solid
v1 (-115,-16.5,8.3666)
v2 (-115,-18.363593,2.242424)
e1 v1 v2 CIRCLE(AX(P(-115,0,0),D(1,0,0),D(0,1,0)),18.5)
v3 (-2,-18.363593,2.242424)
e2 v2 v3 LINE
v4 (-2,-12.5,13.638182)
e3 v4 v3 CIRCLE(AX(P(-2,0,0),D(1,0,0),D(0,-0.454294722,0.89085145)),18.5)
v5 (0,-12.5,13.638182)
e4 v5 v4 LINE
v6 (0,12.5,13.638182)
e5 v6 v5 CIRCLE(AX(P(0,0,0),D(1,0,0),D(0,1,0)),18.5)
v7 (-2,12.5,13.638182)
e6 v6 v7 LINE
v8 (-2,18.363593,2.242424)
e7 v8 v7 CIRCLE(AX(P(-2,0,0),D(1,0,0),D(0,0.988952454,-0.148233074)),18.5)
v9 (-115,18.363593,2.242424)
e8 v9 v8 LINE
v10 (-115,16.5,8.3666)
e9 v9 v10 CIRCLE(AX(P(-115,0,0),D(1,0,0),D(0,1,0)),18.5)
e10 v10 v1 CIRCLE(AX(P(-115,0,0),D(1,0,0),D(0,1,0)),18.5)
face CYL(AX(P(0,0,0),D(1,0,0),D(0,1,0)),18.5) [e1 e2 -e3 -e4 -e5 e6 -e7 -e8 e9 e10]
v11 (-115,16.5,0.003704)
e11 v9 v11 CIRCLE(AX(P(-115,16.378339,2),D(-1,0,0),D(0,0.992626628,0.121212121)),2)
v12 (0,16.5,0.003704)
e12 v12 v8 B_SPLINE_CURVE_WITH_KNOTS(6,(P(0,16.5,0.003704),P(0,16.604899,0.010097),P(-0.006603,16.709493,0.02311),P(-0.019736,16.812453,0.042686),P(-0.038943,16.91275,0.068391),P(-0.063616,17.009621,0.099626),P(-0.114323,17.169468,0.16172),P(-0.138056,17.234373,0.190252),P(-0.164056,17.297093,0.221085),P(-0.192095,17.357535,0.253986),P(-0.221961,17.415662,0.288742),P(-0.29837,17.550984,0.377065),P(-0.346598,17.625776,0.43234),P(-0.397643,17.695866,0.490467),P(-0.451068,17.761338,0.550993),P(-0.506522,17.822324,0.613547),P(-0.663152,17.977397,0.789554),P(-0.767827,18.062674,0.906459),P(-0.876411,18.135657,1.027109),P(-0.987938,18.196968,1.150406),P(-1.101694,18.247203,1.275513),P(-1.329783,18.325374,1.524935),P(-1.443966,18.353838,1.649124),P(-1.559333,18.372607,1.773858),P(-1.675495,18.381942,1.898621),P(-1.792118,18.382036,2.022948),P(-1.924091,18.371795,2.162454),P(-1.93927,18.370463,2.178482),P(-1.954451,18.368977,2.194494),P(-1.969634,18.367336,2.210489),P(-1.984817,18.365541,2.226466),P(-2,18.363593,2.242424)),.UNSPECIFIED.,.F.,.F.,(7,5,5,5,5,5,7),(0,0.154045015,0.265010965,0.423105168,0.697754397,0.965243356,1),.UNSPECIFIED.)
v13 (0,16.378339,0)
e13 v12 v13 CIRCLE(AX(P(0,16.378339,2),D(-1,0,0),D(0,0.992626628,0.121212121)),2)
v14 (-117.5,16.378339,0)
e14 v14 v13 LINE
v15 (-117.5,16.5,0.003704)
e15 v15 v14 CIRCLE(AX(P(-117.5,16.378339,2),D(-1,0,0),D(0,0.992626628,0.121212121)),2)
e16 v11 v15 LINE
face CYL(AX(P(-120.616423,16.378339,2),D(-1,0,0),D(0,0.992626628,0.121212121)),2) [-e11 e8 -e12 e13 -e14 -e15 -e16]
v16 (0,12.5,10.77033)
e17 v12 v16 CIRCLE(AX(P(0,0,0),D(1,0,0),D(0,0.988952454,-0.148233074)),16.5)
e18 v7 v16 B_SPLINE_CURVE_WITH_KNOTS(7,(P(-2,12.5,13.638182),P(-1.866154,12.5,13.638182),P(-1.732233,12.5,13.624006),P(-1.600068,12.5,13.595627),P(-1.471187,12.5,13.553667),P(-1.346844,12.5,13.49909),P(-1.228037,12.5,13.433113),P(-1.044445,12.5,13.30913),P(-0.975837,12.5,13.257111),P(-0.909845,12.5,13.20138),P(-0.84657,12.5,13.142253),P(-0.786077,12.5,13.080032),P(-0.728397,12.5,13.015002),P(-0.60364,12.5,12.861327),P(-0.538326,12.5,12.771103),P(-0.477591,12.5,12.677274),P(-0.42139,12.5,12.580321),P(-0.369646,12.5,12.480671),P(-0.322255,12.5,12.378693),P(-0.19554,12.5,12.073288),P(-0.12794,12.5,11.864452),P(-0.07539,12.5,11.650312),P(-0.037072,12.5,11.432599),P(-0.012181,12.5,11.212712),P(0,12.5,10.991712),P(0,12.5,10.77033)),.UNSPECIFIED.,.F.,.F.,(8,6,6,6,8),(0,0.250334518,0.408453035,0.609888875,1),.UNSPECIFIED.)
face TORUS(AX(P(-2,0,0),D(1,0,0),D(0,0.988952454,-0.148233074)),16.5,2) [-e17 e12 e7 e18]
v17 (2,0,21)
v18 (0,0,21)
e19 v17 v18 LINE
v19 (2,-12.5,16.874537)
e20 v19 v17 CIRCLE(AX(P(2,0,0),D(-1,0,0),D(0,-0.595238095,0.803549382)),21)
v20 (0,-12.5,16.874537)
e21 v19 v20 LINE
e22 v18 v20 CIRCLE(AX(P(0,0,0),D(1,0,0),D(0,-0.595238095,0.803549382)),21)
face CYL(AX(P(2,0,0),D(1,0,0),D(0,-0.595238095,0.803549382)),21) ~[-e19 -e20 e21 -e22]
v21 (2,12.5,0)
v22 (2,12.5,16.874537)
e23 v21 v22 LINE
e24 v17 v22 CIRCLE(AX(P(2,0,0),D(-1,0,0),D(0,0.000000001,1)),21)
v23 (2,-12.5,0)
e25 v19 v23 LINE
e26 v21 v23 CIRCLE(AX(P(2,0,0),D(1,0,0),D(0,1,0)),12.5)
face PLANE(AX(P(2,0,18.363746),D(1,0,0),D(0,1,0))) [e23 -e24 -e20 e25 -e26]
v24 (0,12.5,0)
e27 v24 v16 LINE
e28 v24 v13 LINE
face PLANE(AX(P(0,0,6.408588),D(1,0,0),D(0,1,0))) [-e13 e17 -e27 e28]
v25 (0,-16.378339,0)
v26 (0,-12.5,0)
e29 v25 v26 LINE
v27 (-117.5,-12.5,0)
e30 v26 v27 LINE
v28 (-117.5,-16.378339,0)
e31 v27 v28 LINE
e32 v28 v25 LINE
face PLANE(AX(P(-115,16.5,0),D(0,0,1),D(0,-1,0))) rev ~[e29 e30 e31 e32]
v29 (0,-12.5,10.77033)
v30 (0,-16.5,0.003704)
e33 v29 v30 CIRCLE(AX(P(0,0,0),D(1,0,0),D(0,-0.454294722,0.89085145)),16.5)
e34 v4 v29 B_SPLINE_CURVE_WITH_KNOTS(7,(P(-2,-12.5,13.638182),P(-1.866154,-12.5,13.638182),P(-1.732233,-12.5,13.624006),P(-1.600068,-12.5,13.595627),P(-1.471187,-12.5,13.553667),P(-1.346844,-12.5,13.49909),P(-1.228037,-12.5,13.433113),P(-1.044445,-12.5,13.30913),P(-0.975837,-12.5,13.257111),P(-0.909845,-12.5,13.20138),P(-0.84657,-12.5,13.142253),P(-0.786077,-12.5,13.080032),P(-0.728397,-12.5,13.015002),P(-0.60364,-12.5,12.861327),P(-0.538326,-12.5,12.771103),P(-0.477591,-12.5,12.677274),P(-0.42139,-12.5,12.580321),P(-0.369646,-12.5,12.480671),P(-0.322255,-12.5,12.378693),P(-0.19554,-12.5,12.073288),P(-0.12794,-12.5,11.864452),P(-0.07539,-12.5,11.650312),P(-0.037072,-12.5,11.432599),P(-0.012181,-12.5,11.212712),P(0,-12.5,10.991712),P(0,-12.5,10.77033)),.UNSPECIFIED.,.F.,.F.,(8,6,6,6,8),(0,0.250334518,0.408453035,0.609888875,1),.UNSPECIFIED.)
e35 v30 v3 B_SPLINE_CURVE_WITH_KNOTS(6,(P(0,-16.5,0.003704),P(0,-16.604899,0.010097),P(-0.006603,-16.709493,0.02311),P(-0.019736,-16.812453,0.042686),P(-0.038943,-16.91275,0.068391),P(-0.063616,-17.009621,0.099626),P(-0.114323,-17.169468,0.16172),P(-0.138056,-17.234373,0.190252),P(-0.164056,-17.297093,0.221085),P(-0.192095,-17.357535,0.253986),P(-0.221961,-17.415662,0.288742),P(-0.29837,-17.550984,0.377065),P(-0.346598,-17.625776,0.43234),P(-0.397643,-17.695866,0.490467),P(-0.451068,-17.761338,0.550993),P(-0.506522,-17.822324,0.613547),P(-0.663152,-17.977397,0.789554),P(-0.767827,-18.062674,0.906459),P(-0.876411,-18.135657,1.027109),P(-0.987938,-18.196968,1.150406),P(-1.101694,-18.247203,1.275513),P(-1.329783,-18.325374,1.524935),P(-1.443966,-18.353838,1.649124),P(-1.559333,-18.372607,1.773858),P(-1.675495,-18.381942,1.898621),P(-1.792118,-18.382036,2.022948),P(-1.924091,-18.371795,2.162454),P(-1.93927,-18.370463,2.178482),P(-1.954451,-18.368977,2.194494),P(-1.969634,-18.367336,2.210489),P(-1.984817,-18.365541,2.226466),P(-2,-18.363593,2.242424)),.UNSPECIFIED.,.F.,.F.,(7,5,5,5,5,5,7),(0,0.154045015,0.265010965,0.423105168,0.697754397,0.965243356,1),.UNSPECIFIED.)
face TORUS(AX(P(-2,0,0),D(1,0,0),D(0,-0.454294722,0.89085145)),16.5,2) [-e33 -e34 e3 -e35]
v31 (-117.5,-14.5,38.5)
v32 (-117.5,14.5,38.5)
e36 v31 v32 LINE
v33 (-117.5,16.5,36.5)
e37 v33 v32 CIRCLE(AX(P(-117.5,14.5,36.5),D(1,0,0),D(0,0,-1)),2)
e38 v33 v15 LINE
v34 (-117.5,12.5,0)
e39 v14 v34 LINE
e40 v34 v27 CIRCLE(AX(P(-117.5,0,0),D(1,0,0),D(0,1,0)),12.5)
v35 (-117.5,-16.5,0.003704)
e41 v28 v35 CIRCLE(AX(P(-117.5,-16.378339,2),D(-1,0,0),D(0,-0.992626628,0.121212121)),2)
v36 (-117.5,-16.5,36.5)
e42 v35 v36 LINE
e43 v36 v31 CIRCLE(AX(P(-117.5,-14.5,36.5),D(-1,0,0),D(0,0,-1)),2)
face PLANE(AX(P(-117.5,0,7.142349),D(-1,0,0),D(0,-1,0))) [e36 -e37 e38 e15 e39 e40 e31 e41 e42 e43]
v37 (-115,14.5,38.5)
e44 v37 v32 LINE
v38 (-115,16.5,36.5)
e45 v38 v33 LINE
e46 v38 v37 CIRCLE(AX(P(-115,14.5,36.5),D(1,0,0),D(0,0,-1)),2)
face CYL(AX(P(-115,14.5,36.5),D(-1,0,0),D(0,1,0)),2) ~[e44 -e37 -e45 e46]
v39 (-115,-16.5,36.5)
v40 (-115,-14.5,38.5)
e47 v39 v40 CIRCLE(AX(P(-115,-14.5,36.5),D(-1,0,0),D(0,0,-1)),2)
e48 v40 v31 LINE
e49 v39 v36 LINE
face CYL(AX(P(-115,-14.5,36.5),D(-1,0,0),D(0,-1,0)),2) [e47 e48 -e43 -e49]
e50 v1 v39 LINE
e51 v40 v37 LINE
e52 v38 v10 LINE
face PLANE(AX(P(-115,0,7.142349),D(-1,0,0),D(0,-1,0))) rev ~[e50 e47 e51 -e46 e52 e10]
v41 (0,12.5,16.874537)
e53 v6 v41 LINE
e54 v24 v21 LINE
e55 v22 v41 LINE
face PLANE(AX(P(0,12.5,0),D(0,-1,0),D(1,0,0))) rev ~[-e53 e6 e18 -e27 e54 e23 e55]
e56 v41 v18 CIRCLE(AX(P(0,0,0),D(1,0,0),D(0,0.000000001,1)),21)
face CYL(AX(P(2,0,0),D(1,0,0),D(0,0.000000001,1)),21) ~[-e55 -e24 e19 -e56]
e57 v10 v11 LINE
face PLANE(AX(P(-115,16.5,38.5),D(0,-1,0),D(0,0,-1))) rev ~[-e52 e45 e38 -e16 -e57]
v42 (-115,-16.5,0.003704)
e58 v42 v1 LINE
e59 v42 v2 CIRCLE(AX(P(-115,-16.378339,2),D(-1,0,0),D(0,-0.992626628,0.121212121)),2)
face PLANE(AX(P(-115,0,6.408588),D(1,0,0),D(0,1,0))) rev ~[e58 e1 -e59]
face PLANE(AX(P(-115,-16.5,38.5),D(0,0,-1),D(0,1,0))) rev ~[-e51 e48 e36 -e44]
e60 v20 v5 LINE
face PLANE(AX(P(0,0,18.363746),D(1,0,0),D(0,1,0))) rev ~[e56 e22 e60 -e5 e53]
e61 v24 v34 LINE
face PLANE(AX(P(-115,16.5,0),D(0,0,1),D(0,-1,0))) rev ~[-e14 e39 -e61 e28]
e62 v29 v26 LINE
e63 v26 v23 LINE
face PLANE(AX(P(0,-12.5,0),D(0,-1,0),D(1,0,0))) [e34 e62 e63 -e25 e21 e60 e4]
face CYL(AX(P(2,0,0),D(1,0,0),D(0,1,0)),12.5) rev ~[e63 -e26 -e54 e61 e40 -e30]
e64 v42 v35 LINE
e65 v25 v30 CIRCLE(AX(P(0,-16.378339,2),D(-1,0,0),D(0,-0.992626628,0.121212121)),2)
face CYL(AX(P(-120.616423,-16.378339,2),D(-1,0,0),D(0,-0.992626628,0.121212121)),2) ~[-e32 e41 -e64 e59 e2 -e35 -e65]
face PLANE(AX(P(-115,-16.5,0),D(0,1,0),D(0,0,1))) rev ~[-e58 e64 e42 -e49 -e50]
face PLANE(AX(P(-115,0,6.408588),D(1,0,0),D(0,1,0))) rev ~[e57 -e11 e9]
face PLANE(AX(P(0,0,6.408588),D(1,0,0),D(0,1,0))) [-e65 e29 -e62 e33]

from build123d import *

# Parameters (mm, degrees)
F1_DEPTH     = 115
F3_DEPTH     = 2
F5_DEPTH     = 2.5
F6_R         = 2
F8_DEPTH     = 5
F10_DEPTH    = 119.5
F11_T1_DEPTH = 126.2328463215
F11_T6_ANGLE = 78.4675131369
F12_T1_DEPTH = 124.2328463215
F12_T6_ANGLE = 71.5045093033


# Not quite as in the source:
# - a fillet or chamfer that OpenCascade refuses, or shapes differently, is made with other operations: its cross-section is extruded or revolved along the edge and cut away or added


with BuildPart() as f1:
    # F0 (on Right) → F1 (new body)
    with BuildSketch(Plane.YZ):
        with BuildLine():
            Line((-18.5, 0), (18.5, 0))
            ThreePointArc((18.5, 0), (0, 18.5), (-18.5, 0))
        make_face()
    extrude(amount=-F1_DEPTH)

    # F2 (on face) → F3 (join)
    with BuildSketch(Plane.YZ):
        with BuildLine():
            Line((12.5, 21), (-12.5, 21))
            Line((-12.5, 21), (-12.5, 13.638181697))
            ThreePointArc((-12.5, 13.638181697), (0, 18.5), (12.5, 13.638181697))
            Line((12.5, 13.638181697), (12.5, 21))
        make_face()
        with BuildLine():
            ThreePointArc((12.5, 13.638181697), (0, 18.5), (-12.5, 13.638181697))
            Line((-12.5, 13.638181697), (-12.5, 0))
            Line((-12.5, 0), (12.5, 0))
            Line((12.5, 0), (12.5, 13.638181697))
        make_face()
    extrude(amount=F3_DEPTH)

    # F4 (on face) → F5 (join)
    with BuildSketch(Plane(origin=(-115, 0, 0), x_dir=(0, -1, 0), z_dir=(-1, 0, 0))):
        with BuildLine():
            Line((-16.5, 8.3666002653), (-16.5, 0))
            Line((-16.5, 0), (16.5, 0))
            Line((16.5, 0), (16.5, 8.3666002653))
            ThreePointArc((16.5, 8.3666002653), (0, 18.5), (-16.5, 8.3666002653))
        make_face()
        with BuildLine():
            Line((-16.5, 38.5), (-16.5, 8.3666002653))
            ThreePointArc((-16.5, 8.3666002653), (0, 18.5), (16.5, 8.3666002653))
            Line((16.5, 8.3666002653), (16.5, 38.5))
            Line((16.5, 38.5), (-16.5, 38.5))
        make_face()
    extrude(amount=F5_DEPTH)

    # F6
    f6_edges = [f1.edges().sort_by_distance(p)[0] for p in [
        (-116.25, 16.5, 38.5),
        (-116.25, -16.5, 38.5),
    ]]
    fillet(f6_edges, radius=F6_R)

    # F7 (on face) → F8 (cut)
    with BuildSketch(Plane.YZ.offset(2)):
        with BuildLine():
            Line((-12.5, 21), (-12.5, 16.8745370307))
            ThreePointArc((-12.5, 16.8745370307), (-6.5815925928, 19.9419818208), (1.93e-08, 21))
            Line((1.93e-08, 21), (-12.5, 21))
        make_face()
        with BuildLine():
            ThreePointArc((1.93e-08, 21), (6.5815926111, 19.9419818148), (12.5, 16.8745370307))
            Line((12.5, 16.8745370307), (12.5, 21))
            Line((12.5, 21), (1.93e-08, 21))
        make_face()
    extrude(amount=-F8_DEPTH, mode=Mode.SUBTRACT)

    # F9 (on face) → F10 (cut, through all)
    with BuildSketch(Plane.YZ.offset(2)):
        with BuildLine():
            Line((-12.5, 0), (12.5, 0))
            ThreePointArc((12.5, 0), (0, 12.5), (-12.5, 0))
        make_face()
    extrude(amount=-F10_DEPTH, mode=Mode.SUBTRACT)

    # F11: fillet of radius 2 on 2 edges, made by hand

    # F11_s2 → F11_t1 (cut)
    with BuildSketch(Plane.YZ.offset(-120.6164231607)):
        with BuildLine():
            ThreePointArc((18.3635926092, 2.2424242424), (17.8758119724, 0.6742640694), (16.3783393542, 0))
            Line((16.3783393542, 0), (18.5, 0))
            ThreePointArc((18.5, 0), (18.4658666635, 1.1232846321), (18.3635926092, 2.2424242424))
        make_face()
    extrude(amount=F11_T1_DEPTH, mode=Mode.SUBTRACT)


with BuildPart() as f11_tool4:
    # F11_s5 → F11_t6 (revolve)
    with BuildSketch(Plane(origin=(0, 0, 0), x_dir=(1, 0, 0), z_dir=(0, 0.8908514497, 0.454294722))):
        with BuildLine():
            ThreePointArc((-2, -18.5), (-0.5857864376, -17.9142135624), (0, -16.5))
            Line((0, -16.5), (0, -18.5))
            Line((0, -18.5), (-2, -18.5))
        make_face()
    revolve(axis=Axis((0, 0, 0), (1, 0, 0)), revolution_arc=F11_T6_ANGLE)

    split(bisect_by=Plane.XZ.offset(12.5), keep=Keep.TOP)


with BuildPart() as f1_1:
    add(f1.part)

    # F11_t3: cut F11_tool4
    add(f11_tool4.part, mode=Mode.SUBTRACT)

    # F12: fillet of radius 2 on 2 edges, made by hand

    # F12_s2 → F12_t1 (cut)
    with BuildSketch(Plane.YZ.offset(-120.6164231607)):
        with BuildLine():
            ThreePointArc((-18.3635926092, 2.2424242424), (-17.8758119724, 0.6742640694), (-16.3783393542, 0))
            Line((-16.3783393542, 0), (-18.5, 0))
            ThreePointArc((-18.5, 0), (-18.4658666635, 1.1232846321), (-18.3635926092, 2.2424242424))
        make_face()
    extrude(amount=F12_T1_DEPTH, mode=Mode.SUBTRACT)


with BuildPart() as f12_tool4:
    # F12_s5 → F12_t6 (revolve)
    with BuildSketch(Plane(origin=(0, 0, 0), x_dir=(1, 0, 0), z_dir=(0, -0.1482330737, -0.9889524538))):
        with BuildLine():
            ThreePointArc((-2, -18.5), (-0.5857864376, -17.9142135624), (0, -16.5))
            Line((0, -16.5), (0, -18.5))
            Line((0, -18.5), (-2, -18.5))
        make_face()
    revolve(axis=Axis((0, 0, 0), (1, 0, 0)), revolution_arc=F12_T6_ANGLE)

    split(bisect_by=Plane.XZ.offset(-12.5), keep=Keep.BOTTOM)


with BuildPart() as f1_2:
    add(f1_1.part)

    # F12_t3: cut F12_tool4
    add(f12_tool4.part, mode=Mode.SUBTRACT)


solid = f1_2.part
